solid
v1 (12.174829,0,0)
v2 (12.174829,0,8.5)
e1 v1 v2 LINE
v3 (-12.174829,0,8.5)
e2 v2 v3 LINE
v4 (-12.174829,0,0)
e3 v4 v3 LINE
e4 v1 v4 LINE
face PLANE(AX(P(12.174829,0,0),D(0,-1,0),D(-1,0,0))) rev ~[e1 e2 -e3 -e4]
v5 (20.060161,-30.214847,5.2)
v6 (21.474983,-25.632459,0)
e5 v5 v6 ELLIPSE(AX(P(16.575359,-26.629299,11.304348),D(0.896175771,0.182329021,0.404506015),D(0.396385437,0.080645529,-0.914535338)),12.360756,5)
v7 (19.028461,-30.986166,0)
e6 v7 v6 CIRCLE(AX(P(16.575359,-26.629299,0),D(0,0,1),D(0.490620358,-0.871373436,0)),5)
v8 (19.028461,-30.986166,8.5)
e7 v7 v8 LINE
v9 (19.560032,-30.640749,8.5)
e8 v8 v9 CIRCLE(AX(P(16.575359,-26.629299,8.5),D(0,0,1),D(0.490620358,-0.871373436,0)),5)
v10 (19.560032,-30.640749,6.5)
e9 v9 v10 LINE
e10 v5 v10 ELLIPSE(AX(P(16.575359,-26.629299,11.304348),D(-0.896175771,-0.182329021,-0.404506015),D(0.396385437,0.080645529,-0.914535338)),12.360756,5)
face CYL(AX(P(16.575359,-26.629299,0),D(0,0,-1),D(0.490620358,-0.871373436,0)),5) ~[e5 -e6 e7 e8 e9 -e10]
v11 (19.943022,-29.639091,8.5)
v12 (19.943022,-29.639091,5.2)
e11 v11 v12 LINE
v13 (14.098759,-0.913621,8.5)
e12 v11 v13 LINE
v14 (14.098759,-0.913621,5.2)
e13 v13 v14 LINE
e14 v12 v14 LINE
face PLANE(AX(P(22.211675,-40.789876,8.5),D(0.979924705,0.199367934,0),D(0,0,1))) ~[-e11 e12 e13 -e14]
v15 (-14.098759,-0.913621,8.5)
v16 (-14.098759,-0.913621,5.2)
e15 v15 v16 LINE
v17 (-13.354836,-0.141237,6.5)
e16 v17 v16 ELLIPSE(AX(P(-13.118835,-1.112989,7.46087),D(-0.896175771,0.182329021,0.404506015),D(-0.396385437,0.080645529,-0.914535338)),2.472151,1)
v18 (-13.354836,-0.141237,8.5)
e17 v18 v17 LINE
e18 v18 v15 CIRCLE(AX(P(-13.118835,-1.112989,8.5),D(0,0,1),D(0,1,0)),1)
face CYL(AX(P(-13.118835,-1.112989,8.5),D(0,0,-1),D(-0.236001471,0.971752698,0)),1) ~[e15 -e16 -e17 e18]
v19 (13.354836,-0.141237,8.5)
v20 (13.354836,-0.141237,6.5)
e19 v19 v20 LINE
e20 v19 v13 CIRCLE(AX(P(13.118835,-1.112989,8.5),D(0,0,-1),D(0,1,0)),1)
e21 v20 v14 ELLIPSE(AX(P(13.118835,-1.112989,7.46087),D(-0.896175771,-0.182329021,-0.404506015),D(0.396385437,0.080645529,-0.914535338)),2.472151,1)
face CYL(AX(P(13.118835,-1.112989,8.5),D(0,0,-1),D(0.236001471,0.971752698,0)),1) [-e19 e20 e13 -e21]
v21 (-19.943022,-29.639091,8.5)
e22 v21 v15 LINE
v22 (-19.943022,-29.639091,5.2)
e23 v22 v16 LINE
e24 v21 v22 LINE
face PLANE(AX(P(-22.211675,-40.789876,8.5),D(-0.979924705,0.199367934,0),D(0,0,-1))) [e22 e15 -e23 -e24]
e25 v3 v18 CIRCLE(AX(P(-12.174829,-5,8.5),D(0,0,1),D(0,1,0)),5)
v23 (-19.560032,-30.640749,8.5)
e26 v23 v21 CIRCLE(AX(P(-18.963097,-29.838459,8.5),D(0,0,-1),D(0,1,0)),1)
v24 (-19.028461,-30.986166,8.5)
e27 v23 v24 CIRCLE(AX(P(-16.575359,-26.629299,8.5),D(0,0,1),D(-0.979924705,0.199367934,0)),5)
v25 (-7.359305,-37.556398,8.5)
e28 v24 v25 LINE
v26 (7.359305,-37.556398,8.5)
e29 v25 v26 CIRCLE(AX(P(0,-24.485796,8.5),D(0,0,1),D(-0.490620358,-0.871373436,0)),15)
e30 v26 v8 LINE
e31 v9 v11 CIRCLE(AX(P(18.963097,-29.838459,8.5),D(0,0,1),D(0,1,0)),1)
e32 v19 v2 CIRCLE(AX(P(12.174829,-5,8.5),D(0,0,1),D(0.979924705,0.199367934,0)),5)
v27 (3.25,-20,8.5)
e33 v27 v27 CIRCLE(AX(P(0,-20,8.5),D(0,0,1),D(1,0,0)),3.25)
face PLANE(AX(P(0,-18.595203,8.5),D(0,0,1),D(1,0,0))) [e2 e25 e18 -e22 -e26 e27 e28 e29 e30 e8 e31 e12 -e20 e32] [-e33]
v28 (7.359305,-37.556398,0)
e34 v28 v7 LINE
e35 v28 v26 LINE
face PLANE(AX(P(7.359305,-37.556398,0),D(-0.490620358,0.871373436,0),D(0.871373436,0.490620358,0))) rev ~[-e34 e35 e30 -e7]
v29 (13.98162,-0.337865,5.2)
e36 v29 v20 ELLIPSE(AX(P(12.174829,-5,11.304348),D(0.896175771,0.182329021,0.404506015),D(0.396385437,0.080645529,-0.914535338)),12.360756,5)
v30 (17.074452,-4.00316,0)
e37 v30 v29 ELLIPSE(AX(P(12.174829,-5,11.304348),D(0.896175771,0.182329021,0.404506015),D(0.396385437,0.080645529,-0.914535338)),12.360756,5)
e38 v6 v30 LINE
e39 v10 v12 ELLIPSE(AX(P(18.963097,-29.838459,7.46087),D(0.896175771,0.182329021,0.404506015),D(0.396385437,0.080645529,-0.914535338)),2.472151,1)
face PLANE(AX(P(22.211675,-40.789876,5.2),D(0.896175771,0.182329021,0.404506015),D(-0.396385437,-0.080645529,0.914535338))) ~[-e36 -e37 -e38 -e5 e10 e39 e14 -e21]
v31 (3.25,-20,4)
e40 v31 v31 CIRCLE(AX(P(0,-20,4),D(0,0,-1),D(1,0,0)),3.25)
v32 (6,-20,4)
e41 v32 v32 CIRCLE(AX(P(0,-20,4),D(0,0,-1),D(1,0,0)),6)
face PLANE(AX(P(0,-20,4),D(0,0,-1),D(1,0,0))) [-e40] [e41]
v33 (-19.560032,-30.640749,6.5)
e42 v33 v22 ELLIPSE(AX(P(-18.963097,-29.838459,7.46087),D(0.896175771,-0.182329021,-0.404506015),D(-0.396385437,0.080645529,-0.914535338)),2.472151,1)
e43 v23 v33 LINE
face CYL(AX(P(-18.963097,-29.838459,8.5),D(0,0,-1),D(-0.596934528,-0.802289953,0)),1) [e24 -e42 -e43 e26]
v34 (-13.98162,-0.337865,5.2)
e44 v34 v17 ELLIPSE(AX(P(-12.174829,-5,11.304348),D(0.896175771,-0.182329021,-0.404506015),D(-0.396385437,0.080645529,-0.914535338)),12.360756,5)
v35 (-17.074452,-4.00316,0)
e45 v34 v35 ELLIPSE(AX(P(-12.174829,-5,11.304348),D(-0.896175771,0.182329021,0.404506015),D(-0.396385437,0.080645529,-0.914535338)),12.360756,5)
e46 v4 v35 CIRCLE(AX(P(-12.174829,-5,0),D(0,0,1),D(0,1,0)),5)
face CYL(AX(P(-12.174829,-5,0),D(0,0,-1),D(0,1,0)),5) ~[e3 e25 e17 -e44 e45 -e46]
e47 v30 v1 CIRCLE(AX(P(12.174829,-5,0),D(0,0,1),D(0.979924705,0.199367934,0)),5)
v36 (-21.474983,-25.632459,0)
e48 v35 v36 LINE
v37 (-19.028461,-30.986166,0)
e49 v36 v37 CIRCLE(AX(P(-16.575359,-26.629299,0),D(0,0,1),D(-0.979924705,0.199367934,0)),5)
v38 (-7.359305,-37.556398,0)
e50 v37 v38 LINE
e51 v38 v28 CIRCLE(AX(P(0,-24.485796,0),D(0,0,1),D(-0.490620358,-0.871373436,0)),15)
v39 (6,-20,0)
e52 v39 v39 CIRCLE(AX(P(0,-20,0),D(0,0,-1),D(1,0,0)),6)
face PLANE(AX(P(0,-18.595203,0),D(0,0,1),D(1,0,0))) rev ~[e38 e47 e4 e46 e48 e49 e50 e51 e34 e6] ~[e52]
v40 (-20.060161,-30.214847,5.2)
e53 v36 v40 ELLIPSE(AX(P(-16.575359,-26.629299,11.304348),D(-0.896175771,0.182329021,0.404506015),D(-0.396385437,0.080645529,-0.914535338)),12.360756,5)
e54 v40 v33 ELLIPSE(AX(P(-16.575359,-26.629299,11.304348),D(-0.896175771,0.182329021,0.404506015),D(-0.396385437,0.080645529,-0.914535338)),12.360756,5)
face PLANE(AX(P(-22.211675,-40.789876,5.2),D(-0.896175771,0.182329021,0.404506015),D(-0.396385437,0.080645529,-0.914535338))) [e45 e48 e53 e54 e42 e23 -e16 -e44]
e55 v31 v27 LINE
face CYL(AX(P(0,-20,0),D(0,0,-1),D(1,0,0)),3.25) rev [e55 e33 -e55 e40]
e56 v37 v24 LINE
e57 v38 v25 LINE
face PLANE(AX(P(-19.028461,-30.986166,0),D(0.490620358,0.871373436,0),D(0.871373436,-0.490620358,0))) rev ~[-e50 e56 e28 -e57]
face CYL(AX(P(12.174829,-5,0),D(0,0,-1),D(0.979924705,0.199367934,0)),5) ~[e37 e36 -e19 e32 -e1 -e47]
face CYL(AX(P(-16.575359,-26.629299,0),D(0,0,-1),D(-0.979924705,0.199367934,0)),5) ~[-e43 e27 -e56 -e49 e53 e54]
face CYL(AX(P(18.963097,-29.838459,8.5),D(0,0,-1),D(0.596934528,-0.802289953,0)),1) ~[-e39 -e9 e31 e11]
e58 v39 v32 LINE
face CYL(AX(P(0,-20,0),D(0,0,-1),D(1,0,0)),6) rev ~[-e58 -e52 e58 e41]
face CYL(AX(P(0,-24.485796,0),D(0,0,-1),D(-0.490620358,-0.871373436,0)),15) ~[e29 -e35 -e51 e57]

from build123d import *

# Parameters (mm, degrees)
F0_R     = 3.25
F1_DEPTH = 8.5
F2_R     = 6
F2_R_2   = 3.25
F3_DEPTH = 4
F7_DEPTH = 48.701737703
F8_R     = 1


# Not quite as in the source:
# - a pattern or mirror of a feature is missing from the dataset's text; its kind, count and spacing are read off the source's solid


with BuildPart() as f1:
    # F0 (on Top) → F1 (new body)
    with BuildSketch(Plane.XY):
        with BuildLine():
            Line((21.4749827509, -25.6324591351), (17.0744521737, -4.0031603279))
            ThreePointArc((17.0744521737, -4.0031603279), (15.3383552934, -1.1280367796), (12.1748286506, 0))
            Line((12.1748286506, 0), (0, 0))
            Line((0, 0), (-12.1748286506, 0))
            ThreePointArc((-12.1748286506, 0), (-15.3383552934, -1.1280367796), (-17.0744521737, -4.0031603279))
            Line((-17.0744521737, -4.0031603279), (-21.4749827509, -25.6324591351))
            ThreePointArc((-21.4749827509, -25.6324591351), (-21.1230164973, -28.7074742953), (-19.0284610173, -30.9861659857))
            Line((-19.0284610173, -30.9861659857), (-7.3593053684, -37.5563976295))
            ThreePointArc((-7.3593053684, -37.5563976295), (0, -39.4857960942), (7.3593053684, -37.5563976295))
            Line((7.3593053684, -37.5563976295), (19.0284610173, -30.9861659857))
            ThreePointArc((19.0284610173, -30.9861659857), (21.1230164973, -28.7074742953), (21.4749827509, -25.6324591351))
        make_face()
        with Locations((0, -20)):
            Circle(F0_R, mode=Mode.SUBTRACT)
    extrude(amount=F1_DEPTH)

    # F2 (on face) → F3 (cut)
    with BuildSketch(Plane(origin=(0, 0, 0), x_dir=(1, 0, 0), z_dir=(0, 0, -1))):
        with Locations((0, 20)):
            Circle(F2_R)
        with Locations((0, 20)):
            Circle(F2_R_2, mode=Mode.SUBTRACT)
    extrude(amount=-F3_DEPTH, mode=Mode.SUBTRACT)

    # F6 (on face) → F7 (cut, through all)
    with BuildSketch(Plane(origin=(-8.8517973086, -43.5079737791, 0), x_dir=(-0.9799247046, 0.1993679344, 0), z_dir=(0.1993679344, 0.9799247046, 0))):
        Polygon((15.9335756971, 0), (15.9335756971, 8.5), (13.6335756971, 8.5), (13.6335756971, 5.2), align=None)
    f7 = extrude(amount=F7_DEPTH, mode=Mode.SUBTRACT)

    # F7_copies: F7 across plane
    add(f7.mirror(Plane(origin=(0, 0, 0), x_dir=(0, 0, 1), z_dir=(1, 0, 0))), mode=Mode.SUBTRACT)

    # F8
    f8_edges = [f1.edges().sort_by_distance(p)[0] for p in [
        (-20.060161, -30.214847, 6.85),
        (-13.98162, -0.337865, 6.85),
        (20.060161, -30.214847, 6.85),
        (13.98162, -0.337865, 6.85),
    ]]
    fillet(f8_edges, radius=F8_R)


solid = f1.part
